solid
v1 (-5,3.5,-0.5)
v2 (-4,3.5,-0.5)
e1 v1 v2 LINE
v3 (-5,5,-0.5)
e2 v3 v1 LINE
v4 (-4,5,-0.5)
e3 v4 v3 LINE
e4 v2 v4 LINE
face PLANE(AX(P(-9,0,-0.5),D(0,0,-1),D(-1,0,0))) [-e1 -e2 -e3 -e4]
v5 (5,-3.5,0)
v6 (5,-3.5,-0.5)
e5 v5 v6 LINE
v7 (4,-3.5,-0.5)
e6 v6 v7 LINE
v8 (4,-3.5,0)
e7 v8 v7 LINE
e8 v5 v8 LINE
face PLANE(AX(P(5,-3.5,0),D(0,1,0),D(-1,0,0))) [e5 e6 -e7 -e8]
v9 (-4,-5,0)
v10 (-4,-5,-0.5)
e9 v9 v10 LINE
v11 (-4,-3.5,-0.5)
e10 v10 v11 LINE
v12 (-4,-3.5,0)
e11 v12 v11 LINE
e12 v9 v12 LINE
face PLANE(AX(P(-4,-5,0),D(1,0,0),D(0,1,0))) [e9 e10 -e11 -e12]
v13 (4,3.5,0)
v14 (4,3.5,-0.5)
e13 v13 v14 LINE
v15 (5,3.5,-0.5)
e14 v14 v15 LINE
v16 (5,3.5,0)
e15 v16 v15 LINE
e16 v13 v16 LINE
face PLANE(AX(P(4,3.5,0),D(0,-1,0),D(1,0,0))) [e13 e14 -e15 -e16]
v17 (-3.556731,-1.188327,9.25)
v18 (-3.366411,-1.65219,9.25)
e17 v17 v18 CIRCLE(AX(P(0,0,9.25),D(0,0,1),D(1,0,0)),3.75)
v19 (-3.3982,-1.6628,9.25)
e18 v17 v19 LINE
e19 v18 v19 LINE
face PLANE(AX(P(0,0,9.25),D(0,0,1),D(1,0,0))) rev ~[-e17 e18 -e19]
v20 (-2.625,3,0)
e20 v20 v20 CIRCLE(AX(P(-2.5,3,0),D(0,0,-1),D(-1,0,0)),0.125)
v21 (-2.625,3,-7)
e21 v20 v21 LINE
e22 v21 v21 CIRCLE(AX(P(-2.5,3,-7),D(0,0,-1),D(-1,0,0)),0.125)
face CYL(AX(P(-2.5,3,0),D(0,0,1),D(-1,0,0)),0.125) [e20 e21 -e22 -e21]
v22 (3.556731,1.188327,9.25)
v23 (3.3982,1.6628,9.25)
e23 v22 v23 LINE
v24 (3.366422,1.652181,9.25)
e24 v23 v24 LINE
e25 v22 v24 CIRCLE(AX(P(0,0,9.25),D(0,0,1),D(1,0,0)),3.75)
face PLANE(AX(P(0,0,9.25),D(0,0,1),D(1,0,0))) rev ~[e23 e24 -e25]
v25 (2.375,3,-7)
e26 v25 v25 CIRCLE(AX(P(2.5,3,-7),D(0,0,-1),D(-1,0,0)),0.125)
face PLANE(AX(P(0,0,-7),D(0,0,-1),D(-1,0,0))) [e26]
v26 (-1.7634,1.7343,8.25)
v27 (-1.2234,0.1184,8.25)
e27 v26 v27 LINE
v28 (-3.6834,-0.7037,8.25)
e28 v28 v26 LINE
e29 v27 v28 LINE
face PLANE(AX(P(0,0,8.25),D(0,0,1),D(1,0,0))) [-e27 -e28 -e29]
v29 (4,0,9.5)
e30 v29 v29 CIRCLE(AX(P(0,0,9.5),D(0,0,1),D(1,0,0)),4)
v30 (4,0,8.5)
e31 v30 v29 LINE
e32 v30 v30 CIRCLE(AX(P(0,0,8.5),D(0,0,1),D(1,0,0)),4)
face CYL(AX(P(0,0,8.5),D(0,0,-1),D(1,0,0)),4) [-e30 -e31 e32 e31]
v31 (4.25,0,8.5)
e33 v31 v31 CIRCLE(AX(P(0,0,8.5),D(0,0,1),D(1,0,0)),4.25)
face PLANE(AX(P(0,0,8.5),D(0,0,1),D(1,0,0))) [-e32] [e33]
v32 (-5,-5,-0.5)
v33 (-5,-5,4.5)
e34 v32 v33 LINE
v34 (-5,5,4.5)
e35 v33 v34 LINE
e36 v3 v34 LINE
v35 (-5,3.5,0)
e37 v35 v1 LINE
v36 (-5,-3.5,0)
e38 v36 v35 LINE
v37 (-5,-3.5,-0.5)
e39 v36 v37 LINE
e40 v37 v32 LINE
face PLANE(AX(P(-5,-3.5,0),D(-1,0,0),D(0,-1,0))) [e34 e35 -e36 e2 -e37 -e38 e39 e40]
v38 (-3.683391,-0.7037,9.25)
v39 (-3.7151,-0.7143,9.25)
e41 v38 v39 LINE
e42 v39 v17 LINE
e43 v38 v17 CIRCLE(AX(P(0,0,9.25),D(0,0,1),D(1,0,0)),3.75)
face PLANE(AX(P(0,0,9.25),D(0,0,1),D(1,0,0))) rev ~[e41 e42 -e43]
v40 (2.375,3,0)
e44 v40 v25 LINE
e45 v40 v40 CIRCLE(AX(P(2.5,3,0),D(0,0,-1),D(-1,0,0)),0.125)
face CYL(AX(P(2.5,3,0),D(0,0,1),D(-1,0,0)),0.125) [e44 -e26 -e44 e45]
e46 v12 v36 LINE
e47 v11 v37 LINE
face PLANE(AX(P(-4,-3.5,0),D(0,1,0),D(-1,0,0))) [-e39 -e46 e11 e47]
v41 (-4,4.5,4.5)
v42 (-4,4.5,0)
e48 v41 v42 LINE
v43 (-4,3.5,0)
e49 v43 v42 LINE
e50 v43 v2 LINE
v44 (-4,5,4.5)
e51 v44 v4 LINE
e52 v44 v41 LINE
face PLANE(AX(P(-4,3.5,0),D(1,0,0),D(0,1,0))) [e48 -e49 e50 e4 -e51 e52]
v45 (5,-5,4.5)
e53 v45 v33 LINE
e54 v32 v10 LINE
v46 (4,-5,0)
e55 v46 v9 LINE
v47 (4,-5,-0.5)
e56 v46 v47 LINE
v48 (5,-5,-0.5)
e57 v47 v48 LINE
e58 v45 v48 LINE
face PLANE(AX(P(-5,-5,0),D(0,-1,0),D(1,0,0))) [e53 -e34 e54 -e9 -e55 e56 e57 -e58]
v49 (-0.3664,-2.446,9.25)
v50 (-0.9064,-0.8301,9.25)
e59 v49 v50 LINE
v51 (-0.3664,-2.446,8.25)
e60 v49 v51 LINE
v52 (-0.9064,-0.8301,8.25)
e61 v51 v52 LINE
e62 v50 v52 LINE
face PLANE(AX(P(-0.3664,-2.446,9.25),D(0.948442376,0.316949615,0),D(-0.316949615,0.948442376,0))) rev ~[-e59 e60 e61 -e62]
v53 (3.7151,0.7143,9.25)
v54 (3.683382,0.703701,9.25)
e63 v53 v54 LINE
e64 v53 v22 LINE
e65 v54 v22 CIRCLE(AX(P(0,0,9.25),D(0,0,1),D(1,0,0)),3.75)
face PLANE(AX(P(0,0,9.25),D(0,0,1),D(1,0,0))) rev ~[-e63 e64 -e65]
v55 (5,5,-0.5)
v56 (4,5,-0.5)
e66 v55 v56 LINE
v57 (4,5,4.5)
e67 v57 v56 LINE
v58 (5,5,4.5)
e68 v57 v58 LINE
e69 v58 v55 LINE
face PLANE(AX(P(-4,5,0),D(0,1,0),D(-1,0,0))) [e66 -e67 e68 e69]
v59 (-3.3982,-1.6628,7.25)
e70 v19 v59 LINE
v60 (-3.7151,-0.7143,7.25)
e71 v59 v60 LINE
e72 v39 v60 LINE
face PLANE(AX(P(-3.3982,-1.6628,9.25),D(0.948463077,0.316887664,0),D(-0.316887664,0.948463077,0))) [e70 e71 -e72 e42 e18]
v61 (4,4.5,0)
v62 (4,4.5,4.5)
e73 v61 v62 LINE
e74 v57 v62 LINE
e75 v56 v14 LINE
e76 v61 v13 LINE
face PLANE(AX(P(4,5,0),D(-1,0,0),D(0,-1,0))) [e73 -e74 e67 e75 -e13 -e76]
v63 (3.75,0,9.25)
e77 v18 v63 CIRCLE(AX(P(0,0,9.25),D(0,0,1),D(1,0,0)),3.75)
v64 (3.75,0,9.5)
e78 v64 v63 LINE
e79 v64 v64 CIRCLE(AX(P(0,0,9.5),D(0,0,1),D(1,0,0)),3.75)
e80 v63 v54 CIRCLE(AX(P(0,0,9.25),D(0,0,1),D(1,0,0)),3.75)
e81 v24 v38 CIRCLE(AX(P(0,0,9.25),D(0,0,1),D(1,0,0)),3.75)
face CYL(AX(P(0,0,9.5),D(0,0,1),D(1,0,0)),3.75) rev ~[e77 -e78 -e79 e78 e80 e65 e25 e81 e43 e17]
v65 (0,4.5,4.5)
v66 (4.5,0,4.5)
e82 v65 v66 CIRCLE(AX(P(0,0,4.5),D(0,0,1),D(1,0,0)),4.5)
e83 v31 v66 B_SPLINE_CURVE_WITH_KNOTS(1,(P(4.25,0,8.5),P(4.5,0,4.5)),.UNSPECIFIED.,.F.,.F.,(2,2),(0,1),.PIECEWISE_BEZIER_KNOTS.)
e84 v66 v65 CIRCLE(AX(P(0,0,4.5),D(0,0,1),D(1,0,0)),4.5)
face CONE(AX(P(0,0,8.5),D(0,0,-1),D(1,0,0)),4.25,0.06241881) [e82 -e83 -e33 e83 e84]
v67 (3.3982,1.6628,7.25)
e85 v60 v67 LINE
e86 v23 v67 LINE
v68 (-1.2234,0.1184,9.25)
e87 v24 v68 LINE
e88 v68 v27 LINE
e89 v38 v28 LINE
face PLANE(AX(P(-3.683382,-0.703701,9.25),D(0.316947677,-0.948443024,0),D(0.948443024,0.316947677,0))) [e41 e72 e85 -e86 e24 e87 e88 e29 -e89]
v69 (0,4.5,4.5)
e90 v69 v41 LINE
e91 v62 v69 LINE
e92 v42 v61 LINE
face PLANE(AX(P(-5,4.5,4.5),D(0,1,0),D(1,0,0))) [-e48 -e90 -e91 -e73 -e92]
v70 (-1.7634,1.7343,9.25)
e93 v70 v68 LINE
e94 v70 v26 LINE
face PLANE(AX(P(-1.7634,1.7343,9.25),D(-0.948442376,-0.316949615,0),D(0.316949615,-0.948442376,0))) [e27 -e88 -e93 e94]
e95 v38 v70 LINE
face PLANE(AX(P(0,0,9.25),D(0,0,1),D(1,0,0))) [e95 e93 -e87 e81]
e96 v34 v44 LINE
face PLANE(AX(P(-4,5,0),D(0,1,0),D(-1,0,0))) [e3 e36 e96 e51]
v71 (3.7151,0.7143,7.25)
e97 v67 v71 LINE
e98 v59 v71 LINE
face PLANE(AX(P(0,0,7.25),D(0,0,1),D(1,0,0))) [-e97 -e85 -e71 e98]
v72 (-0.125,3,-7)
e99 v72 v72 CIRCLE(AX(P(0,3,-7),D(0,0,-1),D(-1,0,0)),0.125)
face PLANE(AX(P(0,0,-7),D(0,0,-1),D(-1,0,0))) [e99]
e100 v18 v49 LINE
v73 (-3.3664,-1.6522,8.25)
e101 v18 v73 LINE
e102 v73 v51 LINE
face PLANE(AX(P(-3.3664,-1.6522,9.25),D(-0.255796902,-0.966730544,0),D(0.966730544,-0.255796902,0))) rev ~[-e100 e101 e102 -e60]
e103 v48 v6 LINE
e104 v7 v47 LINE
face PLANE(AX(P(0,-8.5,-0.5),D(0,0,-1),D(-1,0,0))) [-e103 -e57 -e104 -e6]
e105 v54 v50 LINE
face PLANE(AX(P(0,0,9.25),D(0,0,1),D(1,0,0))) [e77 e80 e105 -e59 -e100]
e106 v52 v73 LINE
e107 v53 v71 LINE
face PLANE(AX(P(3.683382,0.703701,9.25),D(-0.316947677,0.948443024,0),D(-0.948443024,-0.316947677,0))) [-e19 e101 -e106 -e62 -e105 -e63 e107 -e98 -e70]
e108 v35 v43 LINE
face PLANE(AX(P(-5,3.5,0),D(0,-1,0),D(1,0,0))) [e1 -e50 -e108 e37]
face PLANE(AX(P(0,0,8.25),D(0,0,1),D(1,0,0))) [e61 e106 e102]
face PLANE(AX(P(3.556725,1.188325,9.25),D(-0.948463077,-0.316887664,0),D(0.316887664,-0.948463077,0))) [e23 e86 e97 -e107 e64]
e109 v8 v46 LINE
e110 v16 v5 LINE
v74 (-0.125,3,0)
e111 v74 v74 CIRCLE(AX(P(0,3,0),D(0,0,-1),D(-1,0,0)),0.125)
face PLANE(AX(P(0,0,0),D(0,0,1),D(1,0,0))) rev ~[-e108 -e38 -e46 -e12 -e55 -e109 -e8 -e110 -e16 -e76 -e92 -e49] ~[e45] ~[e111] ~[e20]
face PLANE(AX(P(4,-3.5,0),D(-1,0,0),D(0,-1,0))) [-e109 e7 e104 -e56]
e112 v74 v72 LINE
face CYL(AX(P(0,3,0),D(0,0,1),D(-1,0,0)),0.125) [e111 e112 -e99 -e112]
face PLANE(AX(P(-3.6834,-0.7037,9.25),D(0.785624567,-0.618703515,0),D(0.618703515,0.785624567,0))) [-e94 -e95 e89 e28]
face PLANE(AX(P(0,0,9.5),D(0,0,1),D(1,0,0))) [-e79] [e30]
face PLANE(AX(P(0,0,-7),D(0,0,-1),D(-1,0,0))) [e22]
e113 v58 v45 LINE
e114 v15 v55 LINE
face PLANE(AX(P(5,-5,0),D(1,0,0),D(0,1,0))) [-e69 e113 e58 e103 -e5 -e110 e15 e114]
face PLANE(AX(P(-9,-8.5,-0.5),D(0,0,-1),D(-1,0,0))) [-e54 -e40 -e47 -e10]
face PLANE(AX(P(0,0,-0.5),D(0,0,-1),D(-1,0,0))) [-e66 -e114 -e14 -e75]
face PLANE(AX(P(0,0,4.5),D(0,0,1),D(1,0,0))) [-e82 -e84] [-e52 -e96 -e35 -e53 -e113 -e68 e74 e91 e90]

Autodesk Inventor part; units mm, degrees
ref_plane "YZ Plane" through (0, 0, 0) normal (1, 0, 0) x (0, 1, 0)
ref_plane "XZ Plane" through (0, 0, 0) normal (0, 1, 0) x (-1, 0, 0)
ref_plane "XY Plane" through (0, 0, 0) normal (0, 0, 1) x (1, 0, 0)
sketch "Sketch1" plane through (0, 0, 0) normal (0, 0, 1) x (1, 0, 0)
  line L0 (-5, 5) -> (5, 5)
  line L1 (5, 5) -> (5, -5)
  line L2 (5, -5) -> (-5, -5)
  line L3 (-5, -5) -> (-5, 5)
  line L4 (-5, 5) -> (5, -5) construction
  line L5 (5, 5) -> (-5, -5) construction
  point P0 (0, 0)
  dimension "d0" = 10
  dimension "d2" = 10
extrude "Extrusion1" add sketch "Sketch1" along normal blind 4.5
sketch "Sketch2" plane through (0, 0, 0) normal (0, 0, -1) x (-1, 0, 0)
  line L0 (-5, 5) -> (-4, 5)
  line L1 (-4, 5) -> (-4, 3.5)
  line L2 (-4, 3.5) -> (-5, 3.5)
  line L3 (-5, 3.5) -> (-5, 5)
  point P0 (0, 0)
  dimension "d5" = 1
  dimension "d6" = 1.5
extrude "Extrusion2" add sketch "Sketch2" along normal blind 0.5
pattern_linear "Rectangular Pattern1" count 2 spacing 9 along (-1, 0, 0) count 2 spacing 8.5 along (0, -1, 0) of "Extrusion2"
sketch "Sketch3" plane through (-5, 5, 4.5) normal (0, 1, 0) x (1, 0, 0)
  line L0 (10, 0) -> (0, 0) projected
  line L1 (1, 4.5) -> (9, 4.5)
  line L2 (9, 4.5) -> (9, 0)
  line L3 (9, 0) -> (1, 0)
  line L4 (1, 0) -> (1, 4.5)
  point P0 (5, 4.5)
extrude "Extrusion3" cut sketch "Sketch3" against normal blind 0.5
sketch "Sketch4" plane through (0, 0, 0) normal (0, 0, -1) x (-1, 0, 0)
  line L0 (4, 4.5) -> (-4, 4.5) projected
  circle A0 centre (0, 3) radius 0.125
  circle A1 centre (2.5, 3) radius 0.125
  circle A2 centre (-2.5, 3) radius 0.125
  point P0 (0, 0)
  dimension "d17" = 2.5
  dimension "d19" = 2.5
  dimension "d20" = 0.25
  dimension "d21" = 1.5
extrude "Extrusion4" add sketch "Sketch4" along normal blind 7
sketch "Sketch5" plane through (0, 0, 4.5) normal (0, 0, 1) x (1, 0, 0)
  circle A0 centre (0, 0) radius 4.5
  dimension "d25" = 9
ref_plane "Work Plane1" through (0, 0, 8.5) normal (0, 0, 1) x (1, 0, 0)
sketch "Sketch6" plane through (0, 0, 8.5) normal (0, 0, 1) x (1, 0, 0)
  circle A0 centre (0, 0) radius 4.25
  dimension "d27" = 8.5
loft "Loft1" add profiles "Sketch6", "Sketch5"
sketch "Sketch8" plane through (0, 0, 8.5) normal (0, 0, 1) x (1, 0, 0)
  circle A0 centre (0, 0) radius 4.25 projected
  circle A1 centre (0, 0) radius 4
  dimension "d34" = 8
extrude "Extrusion5" add sketch "Sketch8" along normal blind 1 contours A1
sketch "Sketch9" plane through (0, 0, 9.5) normal (0, 0, 1) x (1, 0, 0)
  circle A0 centre (0, 0) radius 4 projected
  circle A1 centre (0, 0) radius 3.75
  dimension "d38" = 7.5
extrude "Extrusion6" cut sketch "Sketch9" against normal blind 0.25 contours A1
sketch "Sketch10" plane through (0, 0, 9.25) normal (0, 0, 1) x (1, 0, 0)
  circle A0 centre (0, 0) radius 3.75 projected
  line L0 (3.7151, 0.7143) -> (-3.3982, -1.6628)
  line L1 (-3.3982, -1.6628) -> (-3.7151, -0.7143)
  line L2 (-3.7151, -0.7143) -> (3.3982, 1.6628)
  line L3 (3.3982, 1.6628) -> (3.7151, 0.7143)
  line L4 (3.7151, 0.7143) -> (-3.7151, -0.7143) construction
  line L5 (-3.3982, -1.6628) -> (3.3982, 1.6628) construction
  dimension "d42" = 1
  dimension "d44" = 7.5
extrude "Extrusion7" cut sketch "Sketch10" against normal blind 2 contours L0 A0 L2 | A0 L3 L0 | L0 L1 A0 | A0 L2 L3 | L1 L2 A0
sketch "Sketch11" plane through (0, 0, 9.25) normal (0, 0, 1) x (1, 0, 0)
  line L0 (3.6834, 0.7037) -> (-3.3664, -1.6522) projected
  line L1 (-3.3664, -1.6522) -> (-0.3664, -2.446)
  line L2 (-0.3664, -2.446) -> (-0.9064, -0.8301)
  dimension "d49" = 3
  dimension "d51" = 56.7
  dimension "d53" = 1.6159
extrude "Extrusion8" cut sketch "Sketch11" against normal blind 1
sketch "Sketch13" plane through (0, 0, 9.25) normal (0, 0, 1) x (1, 0, 0)
  arc A0 (3.3664, 1.6522) -> (-3.6834, -0.7037) centre (0, 0) ccw projected
  line L0 (3.6834, 0.7037) -> (-3.3664, -1.6522)
  line L1 (-3.3664, -1.6522) -> (-0.3664, -2.446)
  line L2 (-0.3664, -2.446) -> (-0.9064, -0.8301)
  line L3 (0, 0) -> (-3.5718, -1.1936)
  line L4 (3.3664, 1.6522) -> (-3.6834, -0.7037)
  line L5 (-3.6834, -0.7037) -> (-1.7634, 1.7343)
  line L6 (-1.7634, 1.7343) -> (-1.2234, 0.1184)
  dimension "d55" = 3
  dimension "d56" = 56.7
  dimension "d57" = 1.6159
extrude "Extrusion9" cut sketch "Sketch13" against normal blind 1 contours L5 L6 L4
properties part number "potentiometer"
